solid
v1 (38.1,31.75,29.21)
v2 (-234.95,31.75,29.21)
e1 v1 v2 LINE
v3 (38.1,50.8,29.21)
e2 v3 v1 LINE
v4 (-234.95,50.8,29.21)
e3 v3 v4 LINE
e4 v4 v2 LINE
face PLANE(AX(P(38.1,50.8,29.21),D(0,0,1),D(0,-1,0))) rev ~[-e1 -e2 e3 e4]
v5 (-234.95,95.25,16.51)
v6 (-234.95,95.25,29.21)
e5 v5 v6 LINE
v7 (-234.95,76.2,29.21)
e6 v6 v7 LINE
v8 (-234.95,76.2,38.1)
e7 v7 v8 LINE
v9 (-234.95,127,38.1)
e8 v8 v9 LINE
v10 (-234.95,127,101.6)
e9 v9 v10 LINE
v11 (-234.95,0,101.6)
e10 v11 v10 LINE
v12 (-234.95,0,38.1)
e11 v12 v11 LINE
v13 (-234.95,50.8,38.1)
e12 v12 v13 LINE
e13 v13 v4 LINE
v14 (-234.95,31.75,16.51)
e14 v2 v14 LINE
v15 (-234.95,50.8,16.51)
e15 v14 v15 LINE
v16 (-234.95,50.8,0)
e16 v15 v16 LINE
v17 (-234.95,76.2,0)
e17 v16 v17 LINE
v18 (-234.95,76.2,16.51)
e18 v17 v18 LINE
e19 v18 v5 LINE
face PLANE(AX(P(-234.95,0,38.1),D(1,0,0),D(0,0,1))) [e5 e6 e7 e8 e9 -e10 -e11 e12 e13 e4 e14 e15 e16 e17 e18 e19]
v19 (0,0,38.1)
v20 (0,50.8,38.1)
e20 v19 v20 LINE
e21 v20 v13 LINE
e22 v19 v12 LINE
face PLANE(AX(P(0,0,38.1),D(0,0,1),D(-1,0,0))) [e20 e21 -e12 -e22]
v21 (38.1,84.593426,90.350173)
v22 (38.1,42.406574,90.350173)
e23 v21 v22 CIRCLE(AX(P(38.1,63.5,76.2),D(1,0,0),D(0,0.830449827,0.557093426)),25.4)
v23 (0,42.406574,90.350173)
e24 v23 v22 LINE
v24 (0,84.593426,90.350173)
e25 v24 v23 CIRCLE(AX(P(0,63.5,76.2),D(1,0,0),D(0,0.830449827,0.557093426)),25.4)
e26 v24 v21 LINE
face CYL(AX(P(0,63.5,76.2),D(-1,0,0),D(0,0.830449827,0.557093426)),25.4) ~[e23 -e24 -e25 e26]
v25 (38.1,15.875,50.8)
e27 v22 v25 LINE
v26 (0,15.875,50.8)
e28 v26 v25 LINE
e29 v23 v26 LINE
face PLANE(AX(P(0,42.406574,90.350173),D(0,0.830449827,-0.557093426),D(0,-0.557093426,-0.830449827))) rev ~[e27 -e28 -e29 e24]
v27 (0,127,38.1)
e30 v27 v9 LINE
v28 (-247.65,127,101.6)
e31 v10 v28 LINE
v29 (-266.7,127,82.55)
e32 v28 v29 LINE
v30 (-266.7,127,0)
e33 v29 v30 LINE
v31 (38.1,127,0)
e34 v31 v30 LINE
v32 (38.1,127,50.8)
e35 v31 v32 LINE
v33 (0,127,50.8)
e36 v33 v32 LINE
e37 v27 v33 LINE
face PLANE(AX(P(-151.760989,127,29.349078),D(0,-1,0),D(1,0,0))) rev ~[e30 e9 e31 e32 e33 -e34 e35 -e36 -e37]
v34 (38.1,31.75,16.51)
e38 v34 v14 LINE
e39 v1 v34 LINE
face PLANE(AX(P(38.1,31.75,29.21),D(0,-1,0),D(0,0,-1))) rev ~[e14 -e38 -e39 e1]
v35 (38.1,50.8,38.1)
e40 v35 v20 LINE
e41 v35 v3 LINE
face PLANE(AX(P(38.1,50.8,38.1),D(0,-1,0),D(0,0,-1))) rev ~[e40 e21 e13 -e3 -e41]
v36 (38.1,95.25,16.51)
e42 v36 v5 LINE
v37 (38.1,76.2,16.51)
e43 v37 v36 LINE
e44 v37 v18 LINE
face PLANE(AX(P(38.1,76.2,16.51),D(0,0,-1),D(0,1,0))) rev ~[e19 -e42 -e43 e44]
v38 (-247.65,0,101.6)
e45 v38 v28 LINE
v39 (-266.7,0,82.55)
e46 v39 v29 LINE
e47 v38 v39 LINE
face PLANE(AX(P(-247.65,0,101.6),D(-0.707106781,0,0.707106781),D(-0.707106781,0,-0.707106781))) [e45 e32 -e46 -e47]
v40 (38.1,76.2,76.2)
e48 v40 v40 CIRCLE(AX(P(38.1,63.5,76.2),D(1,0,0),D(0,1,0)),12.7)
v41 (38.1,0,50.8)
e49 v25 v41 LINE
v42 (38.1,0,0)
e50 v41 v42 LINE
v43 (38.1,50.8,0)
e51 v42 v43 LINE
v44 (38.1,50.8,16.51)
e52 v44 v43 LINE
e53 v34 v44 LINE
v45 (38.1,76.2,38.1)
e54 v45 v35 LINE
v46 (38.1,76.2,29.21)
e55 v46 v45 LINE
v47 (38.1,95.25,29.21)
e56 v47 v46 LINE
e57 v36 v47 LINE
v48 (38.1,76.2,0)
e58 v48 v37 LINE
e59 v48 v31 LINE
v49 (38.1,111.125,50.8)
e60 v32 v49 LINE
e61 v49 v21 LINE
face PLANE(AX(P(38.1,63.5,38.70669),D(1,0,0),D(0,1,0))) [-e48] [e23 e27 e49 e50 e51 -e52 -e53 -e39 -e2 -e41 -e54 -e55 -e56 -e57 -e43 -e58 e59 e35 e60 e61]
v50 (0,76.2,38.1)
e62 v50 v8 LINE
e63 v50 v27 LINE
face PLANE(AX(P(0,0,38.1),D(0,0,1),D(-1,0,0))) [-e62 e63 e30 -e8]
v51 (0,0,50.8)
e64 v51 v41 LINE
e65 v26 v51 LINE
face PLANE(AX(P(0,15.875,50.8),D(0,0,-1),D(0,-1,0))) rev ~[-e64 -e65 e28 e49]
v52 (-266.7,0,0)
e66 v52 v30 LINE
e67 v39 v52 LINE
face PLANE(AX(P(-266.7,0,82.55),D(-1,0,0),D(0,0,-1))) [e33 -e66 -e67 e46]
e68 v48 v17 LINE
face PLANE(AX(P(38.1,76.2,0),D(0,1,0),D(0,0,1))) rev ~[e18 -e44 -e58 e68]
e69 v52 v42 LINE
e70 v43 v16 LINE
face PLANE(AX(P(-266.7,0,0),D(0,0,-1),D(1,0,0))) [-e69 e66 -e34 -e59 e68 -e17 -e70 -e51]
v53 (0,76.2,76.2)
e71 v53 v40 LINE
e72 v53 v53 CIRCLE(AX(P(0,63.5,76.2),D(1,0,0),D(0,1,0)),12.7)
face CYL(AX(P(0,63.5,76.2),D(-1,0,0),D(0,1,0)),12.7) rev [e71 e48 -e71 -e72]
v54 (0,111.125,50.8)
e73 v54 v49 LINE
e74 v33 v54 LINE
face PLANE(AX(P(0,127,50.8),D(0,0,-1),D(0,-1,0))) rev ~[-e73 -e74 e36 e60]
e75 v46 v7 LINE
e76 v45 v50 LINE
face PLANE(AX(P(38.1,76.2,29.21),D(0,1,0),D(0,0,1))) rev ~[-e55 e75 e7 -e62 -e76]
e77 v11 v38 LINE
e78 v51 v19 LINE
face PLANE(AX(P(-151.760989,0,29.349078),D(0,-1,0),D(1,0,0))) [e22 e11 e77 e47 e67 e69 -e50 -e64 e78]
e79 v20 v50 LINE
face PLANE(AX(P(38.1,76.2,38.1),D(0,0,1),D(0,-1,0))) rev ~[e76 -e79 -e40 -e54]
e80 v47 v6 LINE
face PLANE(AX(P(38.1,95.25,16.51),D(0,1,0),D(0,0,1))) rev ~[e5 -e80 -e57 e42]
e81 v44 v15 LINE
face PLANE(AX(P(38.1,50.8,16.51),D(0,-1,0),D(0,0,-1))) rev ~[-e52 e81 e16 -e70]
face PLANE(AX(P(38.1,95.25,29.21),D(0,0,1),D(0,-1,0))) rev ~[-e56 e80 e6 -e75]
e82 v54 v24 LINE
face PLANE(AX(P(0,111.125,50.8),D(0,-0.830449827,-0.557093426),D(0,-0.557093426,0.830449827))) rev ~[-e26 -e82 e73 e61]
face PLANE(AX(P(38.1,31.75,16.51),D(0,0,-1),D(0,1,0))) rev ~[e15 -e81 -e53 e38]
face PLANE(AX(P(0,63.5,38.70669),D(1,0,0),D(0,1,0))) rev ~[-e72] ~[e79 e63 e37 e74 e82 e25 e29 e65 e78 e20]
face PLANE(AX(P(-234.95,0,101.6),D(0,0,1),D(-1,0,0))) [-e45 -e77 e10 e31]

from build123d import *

# Parameters (mm, degrees)
F0_R     = 12.7
F1_DEPTH = 38.1
F3_DEPTH = 127
F5_DEPTH = 273.05


# Not quite as in the source:
# - a feature names something its author has since deleted; it is built from what else it names


with BuildPart() as f1:
    # F0 (on Right) → F1 (new body)
    with BuildSketch(Plane.YZ):
        with BuildLine():
            Line((0, 50.8), (0, 0))
            Line((0, 0), (127, 0))
            Line((127, 0), (127, 50.8))
            Line((127, 50.8), (111.125, 50.8))
            Line((111.125, 50.8), (84.5934256055, 90.3501730104))
            ThreePointArc((84.5934256055, 90.3501730104), (63.5, 101.6), (42.4065743945, 90.3501730104))
            Line((42.4065743945, 90.3501730104), (15.875, 50.8))
            Line((15.875, 50.8), (0, 50.8))
        make_face()
        with Locations((63.5, 76.2)):
            Circle(F0_R, mode=Mode.SUBTRACT)
    extrude(amount=F1_DEPTH)

    # F2 (on face) → F3 (join)
    with BuildSketch(Plane.XZ):
        Polygon((0, 0), (0, 38.1), (-234.95, 38.1), (-234.95, 101.6), (-247.65, 101.6), (-266.7, 82.55), (-266.7, 0), align=None)
    extrude(amount=-F3_DEPTH)

    # F4 (on face) → F5 (cut)
    with BuildSketch(Plane.YZ.offset(38.1)):
        Polygon((50.8, 0), (63.5, 0), (76.2, 0), (76.2, 16.51), (95.25, 16.51), (95.25, 29.21), (76.2, 29.21), (76.2, 38.1), (50.8, 38.1), (50.8, 29.21), (31.75, 29.21), (31.75, 16.51), (50.8, 16.51), align=None)
    extrude(amount=-F5_DEPTH, mode=Mode.SUBTRACT)


solid = f1.part
